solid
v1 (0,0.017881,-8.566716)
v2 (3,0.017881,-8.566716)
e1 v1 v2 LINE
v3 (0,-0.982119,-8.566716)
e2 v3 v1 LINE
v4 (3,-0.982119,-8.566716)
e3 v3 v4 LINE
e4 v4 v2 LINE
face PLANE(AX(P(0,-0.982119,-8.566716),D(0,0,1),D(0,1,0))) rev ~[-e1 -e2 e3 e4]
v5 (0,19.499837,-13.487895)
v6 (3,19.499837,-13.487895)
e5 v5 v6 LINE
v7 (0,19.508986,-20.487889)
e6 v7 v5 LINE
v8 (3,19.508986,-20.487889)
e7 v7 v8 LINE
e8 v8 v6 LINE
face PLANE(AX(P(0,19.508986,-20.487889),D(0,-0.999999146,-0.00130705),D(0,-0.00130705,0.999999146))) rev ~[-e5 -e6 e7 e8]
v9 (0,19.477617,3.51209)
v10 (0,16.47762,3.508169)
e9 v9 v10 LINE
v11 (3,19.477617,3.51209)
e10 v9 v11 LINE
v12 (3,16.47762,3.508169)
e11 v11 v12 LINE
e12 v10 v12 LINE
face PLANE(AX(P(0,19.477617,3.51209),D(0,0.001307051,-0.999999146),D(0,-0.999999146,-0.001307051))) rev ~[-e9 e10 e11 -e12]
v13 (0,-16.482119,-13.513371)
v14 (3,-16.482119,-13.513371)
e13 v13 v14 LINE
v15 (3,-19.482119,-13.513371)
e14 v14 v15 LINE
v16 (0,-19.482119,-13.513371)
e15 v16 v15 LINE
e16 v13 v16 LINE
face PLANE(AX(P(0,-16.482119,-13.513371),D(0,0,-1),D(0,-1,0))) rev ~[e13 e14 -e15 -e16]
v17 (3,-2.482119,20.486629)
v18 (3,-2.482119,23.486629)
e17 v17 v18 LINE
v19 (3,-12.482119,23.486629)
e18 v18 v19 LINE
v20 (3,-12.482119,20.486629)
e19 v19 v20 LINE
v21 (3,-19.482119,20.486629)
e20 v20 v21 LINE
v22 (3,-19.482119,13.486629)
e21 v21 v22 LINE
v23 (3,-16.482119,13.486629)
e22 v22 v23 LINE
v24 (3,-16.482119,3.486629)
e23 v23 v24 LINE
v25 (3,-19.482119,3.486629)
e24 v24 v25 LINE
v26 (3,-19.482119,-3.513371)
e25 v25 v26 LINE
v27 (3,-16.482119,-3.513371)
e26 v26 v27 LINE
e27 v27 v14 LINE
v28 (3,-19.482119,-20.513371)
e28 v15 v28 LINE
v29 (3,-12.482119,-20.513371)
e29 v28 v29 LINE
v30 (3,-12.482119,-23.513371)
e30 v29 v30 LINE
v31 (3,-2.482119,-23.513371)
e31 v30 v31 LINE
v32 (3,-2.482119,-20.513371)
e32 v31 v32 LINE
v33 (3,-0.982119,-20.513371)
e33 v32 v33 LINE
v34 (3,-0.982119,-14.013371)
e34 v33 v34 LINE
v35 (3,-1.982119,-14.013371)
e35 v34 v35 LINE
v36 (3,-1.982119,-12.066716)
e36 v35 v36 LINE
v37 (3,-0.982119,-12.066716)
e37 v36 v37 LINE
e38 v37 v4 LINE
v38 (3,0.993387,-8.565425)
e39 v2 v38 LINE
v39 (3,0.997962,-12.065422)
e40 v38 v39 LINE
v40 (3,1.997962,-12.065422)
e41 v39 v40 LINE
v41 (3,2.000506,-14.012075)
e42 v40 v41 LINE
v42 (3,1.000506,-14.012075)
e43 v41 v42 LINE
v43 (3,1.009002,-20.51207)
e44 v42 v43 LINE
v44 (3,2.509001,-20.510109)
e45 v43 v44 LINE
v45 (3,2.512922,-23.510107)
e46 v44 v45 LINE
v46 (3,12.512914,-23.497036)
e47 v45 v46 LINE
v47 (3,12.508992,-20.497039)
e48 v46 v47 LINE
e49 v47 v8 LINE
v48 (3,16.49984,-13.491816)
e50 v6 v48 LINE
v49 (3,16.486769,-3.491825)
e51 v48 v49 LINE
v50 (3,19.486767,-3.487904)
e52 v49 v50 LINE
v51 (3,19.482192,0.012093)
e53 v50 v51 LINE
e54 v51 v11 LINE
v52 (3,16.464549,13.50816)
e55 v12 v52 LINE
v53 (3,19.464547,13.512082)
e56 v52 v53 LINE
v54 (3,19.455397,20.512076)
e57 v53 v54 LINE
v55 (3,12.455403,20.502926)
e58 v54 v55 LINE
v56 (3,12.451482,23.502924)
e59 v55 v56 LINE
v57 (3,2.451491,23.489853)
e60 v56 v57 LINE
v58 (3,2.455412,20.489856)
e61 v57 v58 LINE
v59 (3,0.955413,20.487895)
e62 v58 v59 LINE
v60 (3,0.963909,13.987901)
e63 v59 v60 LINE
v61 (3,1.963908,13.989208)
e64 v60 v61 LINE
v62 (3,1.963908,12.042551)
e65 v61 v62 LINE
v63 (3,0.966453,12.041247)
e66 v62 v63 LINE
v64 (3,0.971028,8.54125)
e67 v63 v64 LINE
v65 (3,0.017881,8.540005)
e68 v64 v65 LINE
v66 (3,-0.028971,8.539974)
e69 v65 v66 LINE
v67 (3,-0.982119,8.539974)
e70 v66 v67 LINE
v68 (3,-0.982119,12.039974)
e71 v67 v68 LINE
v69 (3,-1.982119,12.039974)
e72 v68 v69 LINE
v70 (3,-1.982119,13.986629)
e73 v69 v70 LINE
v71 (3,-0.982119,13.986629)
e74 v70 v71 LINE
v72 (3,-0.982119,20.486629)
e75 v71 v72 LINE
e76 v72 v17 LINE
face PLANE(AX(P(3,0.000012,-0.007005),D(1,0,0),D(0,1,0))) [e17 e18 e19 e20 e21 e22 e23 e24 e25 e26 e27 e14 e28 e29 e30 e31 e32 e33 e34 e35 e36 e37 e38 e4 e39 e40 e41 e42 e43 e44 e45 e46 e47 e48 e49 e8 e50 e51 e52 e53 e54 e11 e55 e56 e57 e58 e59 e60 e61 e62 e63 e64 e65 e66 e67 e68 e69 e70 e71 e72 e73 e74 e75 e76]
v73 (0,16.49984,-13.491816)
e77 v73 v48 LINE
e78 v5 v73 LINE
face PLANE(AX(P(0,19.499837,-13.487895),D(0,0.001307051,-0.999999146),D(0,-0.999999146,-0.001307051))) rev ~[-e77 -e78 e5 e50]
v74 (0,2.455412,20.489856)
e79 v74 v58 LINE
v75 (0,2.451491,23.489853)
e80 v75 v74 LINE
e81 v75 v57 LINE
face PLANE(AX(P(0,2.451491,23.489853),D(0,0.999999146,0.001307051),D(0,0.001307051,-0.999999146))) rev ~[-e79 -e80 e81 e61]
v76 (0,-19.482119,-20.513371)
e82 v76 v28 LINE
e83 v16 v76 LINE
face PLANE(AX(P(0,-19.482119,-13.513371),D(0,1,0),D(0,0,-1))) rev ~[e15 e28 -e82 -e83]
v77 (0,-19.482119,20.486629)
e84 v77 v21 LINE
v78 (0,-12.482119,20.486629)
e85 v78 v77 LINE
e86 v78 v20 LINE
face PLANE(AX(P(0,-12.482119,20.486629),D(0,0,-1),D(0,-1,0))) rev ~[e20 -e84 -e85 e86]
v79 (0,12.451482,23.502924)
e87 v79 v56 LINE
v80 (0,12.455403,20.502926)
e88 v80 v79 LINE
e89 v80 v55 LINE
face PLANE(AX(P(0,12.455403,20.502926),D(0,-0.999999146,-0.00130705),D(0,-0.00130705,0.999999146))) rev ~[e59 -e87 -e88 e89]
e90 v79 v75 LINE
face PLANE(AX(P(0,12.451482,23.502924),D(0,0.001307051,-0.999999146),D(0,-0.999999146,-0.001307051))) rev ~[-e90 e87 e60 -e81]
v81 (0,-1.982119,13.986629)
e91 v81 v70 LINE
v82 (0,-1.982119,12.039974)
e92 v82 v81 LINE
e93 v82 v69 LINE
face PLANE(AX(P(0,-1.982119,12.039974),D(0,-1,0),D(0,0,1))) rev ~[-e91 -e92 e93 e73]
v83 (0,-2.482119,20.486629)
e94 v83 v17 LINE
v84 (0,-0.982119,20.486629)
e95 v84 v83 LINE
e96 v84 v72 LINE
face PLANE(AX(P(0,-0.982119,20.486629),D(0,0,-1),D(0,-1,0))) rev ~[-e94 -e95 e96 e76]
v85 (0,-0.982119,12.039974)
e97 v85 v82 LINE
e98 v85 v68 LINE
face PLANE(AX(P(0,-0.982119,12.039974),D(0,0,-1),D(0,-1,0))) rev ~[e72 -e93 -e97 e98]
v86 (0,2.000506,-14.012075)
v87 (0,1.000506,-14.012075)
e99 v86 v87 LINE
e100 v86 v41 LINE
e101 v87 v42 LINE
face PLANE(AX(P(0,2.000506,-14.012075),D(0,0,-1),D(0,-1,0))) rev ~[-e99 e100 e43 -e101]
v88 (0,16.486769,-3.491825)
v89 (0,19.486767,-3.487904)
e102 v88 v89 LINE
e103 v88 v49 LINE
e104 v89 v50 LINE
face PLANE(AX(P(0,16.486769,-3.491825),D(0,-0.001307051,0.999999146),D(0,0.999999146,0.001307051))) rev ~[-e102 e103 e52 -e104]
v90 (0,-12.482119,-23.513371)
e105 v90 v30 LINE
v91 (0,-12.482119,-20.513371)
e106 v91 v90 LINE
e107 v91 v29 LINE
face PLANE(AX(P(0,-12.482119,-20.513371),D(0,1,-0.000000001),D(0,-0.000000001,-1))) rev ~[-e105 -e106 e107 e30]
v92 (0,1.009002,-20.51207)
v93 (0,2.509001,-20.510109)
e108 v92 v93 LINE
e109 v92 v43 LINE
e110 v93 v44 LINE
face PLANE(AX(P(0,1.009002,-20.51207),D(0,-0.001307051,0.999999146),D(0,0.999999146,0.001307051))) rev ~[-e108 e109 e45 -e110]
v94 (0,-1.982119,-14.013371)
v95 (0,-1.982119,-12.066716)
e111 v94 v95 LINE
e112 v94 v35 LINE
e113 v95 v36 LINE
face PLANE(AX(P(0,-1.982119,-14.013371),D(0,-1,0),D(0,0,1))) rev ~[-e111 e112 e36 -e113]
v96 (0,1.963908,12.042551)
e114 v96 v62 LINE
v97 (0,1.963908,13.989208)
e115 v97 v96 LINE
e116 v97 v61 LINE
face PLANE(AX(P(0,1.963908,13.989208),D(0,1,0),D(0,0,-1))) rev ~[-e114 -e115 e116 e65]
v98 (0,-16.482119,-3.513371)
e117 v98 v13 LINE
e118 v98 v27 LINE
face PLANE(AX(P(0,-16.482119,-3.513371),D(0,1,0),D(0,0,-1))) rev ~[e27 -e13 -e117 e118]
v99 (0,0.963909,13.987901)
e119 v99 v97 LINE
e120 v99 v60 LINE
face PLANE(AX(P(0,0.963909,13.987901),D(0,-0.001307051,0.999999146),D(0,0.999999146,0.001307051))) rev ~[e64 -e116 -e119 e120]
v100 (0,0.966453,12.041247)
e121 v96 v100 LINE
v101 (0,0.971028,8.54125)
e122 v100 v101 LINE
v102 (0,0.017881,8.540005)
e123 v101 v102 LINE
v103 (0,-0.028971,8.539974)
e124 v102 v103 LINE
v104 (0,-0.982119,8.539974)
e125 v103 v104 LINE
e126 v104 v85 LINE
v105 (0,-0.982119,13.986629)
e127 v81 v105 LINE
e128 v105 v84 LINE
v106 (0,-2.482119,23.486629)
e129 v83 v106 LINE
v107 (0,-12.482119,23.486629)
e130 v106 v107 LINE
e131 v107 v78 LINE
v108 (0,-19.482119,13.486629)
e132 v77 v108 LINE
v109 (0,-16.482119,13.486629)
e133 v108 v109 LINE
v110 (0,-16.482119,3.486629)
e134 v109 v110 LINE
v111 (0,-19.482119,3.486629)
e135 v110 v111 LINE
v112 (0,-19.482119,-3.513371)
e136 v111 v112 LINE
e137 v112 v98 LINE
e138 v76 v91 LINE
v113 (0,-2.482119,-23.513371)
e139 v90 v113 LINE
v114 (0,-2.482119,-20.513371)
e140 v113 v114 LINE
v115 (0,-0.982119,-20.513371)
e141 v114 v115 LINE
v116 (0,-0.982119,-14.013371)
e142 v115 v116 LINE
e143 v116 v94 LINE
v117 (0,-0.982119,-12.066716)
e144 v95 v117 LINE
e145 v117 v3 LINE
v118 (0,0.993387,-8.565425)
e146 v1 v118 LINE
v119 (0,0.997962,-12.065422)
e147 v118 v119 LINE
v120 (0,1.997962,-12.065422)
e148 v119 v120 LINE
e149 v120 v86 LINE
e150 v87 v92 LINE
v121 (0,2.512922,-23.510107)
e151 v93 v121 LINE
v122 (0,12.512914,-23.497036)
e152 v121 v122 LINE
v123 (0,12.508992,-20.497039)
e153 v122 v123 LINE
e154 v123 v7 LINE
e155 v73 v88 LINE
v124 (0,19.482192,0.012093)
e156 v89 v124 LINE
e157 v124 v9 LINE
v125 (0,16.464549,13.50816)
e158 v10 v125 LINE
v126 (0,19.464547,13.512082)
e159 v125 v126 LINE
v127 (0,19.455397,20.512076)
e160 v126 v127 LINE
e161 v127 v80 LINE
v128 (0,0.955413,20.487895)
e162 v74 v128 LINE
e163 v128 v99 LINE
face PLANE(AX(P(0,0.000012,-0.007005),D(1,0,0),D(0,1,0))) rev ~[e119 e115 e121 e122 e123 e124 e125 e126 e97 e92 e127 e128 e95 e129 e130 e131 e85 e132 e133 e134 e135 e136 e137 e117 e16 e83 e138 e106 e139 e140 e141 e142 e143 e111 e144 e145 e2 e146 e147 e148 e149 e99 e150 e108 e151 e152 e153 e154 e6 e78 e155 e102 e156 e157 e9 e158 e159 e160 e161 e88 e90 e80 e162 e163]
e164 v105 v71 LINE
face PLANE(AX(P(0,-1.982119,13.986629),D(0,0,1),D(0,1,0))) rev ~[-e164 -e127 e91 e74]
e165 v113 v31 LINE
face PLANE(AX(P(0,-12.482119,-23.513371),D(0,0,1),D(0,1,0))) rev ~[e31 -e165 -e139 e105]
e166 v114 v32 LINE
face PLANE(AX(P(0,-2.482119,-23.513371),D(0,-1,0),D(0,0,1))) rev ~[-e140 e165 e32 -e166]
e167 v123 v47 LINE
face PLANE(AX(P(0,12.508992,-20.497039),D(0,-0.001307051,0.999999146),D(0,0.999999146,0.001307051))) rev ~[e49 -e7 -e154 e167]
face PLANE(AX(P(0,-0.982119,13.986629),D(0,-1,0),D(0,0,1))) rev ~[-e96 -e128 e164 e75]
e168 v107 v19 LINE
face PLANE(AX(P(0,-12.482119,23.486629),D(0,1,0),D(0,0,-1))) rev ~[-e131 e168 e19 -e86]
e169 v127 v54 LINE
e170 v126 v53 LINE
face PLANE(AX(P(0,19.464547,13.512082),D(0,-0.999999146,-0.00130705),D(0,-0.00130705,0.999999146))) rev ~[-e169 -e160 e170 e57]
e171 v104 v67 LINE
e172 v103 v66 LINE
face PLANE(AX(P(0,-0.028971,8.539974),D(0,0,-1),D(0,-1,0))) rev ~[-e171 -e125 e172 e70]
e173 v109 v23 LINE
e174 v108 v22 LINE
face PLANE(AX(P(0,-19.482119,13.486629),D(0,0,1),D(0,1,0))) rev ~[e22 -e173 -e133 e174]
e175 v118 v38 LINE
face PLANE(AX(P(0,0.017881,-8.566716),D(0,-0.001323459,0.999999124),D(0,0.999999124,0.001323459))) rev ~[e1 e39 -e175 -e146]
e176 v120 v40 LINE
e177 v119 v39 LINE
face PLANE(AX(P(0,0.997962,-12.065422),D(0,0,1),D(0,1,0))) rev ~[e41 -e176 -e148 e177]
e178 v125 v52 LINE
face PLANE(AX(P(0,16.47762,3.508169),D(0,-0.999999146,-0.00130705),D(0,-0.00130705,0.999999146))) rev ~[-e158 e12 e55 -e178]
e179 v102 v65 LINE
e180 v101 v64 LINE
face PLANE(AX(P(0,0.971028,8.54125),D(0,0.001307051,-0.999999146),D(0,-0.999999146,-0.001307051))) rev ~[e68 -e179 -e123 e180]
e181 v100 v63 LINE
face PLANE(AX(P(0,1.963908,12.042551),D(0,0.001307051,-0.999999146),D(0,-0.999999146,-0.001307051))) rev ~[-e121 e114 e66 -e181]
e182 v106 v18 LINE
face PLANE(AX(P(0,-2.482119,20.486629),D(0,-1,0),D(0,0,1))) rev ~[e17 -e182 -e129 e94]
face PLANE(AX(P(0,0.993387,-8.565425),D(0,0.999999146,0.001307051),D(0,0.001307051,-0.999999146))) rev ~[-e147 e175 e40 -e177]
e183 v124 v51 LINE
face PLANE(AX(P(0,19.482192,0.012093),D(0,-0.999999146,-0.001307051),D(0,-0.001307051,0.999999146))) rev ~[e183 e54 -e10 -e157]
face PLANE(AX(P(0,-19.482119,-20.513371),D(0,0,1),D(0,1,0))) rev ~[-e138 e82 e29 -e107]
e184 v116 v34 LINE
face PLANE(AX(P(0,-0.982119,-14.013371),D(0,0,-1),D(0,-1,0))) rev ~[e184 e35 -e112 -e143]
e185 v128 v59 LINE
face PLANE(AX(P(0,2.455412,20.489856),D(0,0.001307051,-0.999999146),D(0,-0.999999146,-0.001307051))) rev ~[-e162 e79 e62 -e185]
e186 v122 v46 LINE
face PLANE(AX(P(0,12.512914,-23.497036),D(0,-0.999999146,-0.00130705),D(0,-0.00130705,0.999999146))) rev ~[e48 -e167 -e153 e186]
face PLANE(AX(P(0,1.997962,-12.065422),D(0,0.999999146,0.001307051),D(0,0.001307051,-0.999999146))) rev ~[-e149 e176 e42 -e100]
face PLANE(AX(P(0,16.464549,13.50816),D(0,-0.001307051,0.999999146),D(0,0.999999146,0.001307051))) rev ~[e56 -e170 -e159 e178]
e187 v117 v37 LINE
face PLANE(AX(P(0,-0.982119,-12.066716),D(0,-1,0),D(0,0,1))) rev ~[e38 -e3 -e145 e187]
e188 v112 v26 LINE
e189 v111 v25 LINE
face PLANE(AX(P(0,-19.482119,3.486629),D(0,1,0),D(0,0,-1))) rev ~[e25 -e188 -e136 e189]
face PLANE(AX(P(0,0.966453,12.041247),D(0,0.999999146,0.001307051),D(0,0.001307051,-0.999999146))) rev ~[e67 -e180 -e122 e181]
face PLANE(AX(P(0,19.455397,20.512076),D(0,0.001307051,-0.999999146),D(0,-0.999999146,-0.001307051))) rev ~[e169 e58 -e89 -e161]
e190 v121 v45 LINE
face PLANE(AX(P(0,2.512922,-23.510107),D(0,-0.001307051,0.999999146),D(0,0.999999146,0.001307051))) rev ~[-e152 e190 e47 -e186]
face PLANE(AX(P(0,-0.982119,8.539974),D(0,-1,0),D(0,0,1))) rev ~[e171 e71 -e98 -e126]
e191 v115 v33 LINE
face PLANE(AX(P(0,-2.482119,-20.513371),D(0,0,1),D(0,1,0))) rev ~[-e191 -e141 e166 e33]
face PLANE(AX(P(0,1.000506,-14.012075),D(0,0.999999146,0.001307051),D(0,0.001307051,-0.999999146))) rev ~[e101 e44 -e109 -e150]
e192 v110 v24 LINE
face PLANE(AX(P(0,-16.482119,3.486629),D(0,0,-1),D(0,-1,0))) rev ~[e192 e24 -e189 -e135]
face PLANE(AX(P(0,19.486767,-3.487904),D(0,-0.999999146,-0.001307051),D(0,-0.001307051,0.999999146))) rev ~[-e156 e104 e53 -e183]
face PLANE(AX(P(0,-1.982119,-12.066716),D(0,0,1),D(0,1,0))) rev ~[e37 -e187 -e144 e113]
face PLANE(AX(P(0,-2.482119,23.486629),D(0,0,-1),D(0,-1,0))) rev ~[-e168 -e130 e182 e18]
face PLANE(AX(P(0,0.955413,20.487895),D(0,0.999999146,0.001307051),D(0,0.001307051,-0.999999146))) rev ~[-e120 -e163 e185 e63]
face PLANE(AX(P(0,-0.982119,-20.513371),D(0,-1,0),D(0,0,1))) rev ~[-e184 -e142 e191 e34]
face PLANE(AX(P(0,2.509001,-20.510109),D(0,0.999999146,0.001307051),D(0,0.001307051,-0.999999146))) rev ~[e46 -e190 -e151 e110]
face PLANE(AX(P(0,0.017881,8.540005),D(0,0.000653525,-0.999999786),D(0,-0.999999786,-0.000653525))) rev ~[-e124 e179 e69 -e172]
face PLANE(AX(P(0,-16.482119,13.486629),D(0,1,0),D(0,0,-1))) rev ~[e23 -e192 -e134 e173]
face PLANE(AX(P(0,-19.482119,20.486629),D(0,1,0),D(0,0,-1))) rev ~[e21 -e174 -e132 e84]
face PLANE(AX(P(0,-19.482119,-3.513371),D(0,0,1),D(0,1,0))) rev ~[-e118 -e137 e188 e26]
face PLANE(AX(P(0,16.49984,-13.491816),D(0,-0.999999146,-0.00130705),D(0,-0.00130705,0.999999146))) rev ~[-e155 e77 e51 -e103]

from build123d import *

# Parameters (mm, degrees)
F1_DEPTH = 3


# Not quite as in the source:
# - ends of sketch curves that miss each other by under 0.0002 mm in the source are joined


with BuildPart() as f1:
    # F0 (on Right) → F1 (new body)
    with BuildSketch(Plane.YZ):
        Polygon((-16.4821194199, 3.4866289613), (-19.4821194199, 3.4866289613), (-19.4821194199, -0.0133710387), (-19.4821194199, -3.5133710387), (-16.4821194199, -3.5133710387), (-16.4821194218, -13.5133710387), (-19.4821194199, -13.5133710387), (-19.4821194222, -20.5133710387), (-12.4821194199, -20.5133710387), (-12.4821194214, -23.5133710387), (-2.4821194199, -23.5133710387), (-2.4821194202, -20.5133710387), (-0.9821194199, -20.5133710387), (-0.98211942, -14.0133710387), (-1.9821194199, -14.0133710387), (-1.9821194199, -12.0667160037), (-0.9821194199, -12.0667160037), (-0.98211942, -8.5667160037), (-0.0066117616, -8.5667160037), (0.0178805801, -8.5667160037), (0.9933873842, -8.5654249595), (0.9979620612, -12.0654219699), (1.997962061, -12.0654219699), (2.0005064375, -14.0120753421), (1.0005064375, -14.0120753421), (1.0090022661, -20.5120697898), (2.5090009847, -20.510109214), (2.5129221366, -23.5101066514), (12.5129135944, -23.4970361461), (12.5089924443, -20.4970387087), (19.5089864635, -20.4878893549), (19.499837112, -13.4878953343), (16.4998396723, -13.4918164859), (16.4867691689, -3.4918250278), (19.4867666044, -3.4879038762), (19.4821919275, 0.0120931341), (19.4776172507, 3.5120901445), (16.4776198132, 3.5081689929), (16.4645493098, 13.508160451), (19.4645467453, 13.5120816026), (19.4553973939, 20.5120756232), (12.4554033709, 20.5029262695), (12.4514822208, 23.5029237069), (2.4514907612, 23.4898532016), (2.4554119131, 20.4898557642), (0.9554131941, 20.4878951884), (0.9639090227, 13.9879007406), (1.9639081685, 13.9892077911), (1.9639081683, 12.0425510933), (0.9664533991, 12.0412473684), (0.9710280761, 8.5412503581), (0.0178805401, 8.540004545), (-0.0289710698, 8.5399739263), (-0.9821194199, 8.5399739263), (-0.9821194199, 12.0399739263), (-1.9821194199, 12.0399739263), (-1.9821194199, 13.9866289613), (-0.9821194199, 13.9866289613), (-0.9821194199, 20.4866289613), (-2.4821194199, 20.4866289613), (-2.4821194199, 23.4866289613), (-12.4821194199, 23.4866289613), (-12.4821194199, 20.4866289613), (-19.4821194199, 20.4866289613), (-19.4821194199, 13.4866289613), (-16.4821194199, 13.4866289613), align=None)
    extrude(amount=F1_DEPTH)


solid = f1.part
